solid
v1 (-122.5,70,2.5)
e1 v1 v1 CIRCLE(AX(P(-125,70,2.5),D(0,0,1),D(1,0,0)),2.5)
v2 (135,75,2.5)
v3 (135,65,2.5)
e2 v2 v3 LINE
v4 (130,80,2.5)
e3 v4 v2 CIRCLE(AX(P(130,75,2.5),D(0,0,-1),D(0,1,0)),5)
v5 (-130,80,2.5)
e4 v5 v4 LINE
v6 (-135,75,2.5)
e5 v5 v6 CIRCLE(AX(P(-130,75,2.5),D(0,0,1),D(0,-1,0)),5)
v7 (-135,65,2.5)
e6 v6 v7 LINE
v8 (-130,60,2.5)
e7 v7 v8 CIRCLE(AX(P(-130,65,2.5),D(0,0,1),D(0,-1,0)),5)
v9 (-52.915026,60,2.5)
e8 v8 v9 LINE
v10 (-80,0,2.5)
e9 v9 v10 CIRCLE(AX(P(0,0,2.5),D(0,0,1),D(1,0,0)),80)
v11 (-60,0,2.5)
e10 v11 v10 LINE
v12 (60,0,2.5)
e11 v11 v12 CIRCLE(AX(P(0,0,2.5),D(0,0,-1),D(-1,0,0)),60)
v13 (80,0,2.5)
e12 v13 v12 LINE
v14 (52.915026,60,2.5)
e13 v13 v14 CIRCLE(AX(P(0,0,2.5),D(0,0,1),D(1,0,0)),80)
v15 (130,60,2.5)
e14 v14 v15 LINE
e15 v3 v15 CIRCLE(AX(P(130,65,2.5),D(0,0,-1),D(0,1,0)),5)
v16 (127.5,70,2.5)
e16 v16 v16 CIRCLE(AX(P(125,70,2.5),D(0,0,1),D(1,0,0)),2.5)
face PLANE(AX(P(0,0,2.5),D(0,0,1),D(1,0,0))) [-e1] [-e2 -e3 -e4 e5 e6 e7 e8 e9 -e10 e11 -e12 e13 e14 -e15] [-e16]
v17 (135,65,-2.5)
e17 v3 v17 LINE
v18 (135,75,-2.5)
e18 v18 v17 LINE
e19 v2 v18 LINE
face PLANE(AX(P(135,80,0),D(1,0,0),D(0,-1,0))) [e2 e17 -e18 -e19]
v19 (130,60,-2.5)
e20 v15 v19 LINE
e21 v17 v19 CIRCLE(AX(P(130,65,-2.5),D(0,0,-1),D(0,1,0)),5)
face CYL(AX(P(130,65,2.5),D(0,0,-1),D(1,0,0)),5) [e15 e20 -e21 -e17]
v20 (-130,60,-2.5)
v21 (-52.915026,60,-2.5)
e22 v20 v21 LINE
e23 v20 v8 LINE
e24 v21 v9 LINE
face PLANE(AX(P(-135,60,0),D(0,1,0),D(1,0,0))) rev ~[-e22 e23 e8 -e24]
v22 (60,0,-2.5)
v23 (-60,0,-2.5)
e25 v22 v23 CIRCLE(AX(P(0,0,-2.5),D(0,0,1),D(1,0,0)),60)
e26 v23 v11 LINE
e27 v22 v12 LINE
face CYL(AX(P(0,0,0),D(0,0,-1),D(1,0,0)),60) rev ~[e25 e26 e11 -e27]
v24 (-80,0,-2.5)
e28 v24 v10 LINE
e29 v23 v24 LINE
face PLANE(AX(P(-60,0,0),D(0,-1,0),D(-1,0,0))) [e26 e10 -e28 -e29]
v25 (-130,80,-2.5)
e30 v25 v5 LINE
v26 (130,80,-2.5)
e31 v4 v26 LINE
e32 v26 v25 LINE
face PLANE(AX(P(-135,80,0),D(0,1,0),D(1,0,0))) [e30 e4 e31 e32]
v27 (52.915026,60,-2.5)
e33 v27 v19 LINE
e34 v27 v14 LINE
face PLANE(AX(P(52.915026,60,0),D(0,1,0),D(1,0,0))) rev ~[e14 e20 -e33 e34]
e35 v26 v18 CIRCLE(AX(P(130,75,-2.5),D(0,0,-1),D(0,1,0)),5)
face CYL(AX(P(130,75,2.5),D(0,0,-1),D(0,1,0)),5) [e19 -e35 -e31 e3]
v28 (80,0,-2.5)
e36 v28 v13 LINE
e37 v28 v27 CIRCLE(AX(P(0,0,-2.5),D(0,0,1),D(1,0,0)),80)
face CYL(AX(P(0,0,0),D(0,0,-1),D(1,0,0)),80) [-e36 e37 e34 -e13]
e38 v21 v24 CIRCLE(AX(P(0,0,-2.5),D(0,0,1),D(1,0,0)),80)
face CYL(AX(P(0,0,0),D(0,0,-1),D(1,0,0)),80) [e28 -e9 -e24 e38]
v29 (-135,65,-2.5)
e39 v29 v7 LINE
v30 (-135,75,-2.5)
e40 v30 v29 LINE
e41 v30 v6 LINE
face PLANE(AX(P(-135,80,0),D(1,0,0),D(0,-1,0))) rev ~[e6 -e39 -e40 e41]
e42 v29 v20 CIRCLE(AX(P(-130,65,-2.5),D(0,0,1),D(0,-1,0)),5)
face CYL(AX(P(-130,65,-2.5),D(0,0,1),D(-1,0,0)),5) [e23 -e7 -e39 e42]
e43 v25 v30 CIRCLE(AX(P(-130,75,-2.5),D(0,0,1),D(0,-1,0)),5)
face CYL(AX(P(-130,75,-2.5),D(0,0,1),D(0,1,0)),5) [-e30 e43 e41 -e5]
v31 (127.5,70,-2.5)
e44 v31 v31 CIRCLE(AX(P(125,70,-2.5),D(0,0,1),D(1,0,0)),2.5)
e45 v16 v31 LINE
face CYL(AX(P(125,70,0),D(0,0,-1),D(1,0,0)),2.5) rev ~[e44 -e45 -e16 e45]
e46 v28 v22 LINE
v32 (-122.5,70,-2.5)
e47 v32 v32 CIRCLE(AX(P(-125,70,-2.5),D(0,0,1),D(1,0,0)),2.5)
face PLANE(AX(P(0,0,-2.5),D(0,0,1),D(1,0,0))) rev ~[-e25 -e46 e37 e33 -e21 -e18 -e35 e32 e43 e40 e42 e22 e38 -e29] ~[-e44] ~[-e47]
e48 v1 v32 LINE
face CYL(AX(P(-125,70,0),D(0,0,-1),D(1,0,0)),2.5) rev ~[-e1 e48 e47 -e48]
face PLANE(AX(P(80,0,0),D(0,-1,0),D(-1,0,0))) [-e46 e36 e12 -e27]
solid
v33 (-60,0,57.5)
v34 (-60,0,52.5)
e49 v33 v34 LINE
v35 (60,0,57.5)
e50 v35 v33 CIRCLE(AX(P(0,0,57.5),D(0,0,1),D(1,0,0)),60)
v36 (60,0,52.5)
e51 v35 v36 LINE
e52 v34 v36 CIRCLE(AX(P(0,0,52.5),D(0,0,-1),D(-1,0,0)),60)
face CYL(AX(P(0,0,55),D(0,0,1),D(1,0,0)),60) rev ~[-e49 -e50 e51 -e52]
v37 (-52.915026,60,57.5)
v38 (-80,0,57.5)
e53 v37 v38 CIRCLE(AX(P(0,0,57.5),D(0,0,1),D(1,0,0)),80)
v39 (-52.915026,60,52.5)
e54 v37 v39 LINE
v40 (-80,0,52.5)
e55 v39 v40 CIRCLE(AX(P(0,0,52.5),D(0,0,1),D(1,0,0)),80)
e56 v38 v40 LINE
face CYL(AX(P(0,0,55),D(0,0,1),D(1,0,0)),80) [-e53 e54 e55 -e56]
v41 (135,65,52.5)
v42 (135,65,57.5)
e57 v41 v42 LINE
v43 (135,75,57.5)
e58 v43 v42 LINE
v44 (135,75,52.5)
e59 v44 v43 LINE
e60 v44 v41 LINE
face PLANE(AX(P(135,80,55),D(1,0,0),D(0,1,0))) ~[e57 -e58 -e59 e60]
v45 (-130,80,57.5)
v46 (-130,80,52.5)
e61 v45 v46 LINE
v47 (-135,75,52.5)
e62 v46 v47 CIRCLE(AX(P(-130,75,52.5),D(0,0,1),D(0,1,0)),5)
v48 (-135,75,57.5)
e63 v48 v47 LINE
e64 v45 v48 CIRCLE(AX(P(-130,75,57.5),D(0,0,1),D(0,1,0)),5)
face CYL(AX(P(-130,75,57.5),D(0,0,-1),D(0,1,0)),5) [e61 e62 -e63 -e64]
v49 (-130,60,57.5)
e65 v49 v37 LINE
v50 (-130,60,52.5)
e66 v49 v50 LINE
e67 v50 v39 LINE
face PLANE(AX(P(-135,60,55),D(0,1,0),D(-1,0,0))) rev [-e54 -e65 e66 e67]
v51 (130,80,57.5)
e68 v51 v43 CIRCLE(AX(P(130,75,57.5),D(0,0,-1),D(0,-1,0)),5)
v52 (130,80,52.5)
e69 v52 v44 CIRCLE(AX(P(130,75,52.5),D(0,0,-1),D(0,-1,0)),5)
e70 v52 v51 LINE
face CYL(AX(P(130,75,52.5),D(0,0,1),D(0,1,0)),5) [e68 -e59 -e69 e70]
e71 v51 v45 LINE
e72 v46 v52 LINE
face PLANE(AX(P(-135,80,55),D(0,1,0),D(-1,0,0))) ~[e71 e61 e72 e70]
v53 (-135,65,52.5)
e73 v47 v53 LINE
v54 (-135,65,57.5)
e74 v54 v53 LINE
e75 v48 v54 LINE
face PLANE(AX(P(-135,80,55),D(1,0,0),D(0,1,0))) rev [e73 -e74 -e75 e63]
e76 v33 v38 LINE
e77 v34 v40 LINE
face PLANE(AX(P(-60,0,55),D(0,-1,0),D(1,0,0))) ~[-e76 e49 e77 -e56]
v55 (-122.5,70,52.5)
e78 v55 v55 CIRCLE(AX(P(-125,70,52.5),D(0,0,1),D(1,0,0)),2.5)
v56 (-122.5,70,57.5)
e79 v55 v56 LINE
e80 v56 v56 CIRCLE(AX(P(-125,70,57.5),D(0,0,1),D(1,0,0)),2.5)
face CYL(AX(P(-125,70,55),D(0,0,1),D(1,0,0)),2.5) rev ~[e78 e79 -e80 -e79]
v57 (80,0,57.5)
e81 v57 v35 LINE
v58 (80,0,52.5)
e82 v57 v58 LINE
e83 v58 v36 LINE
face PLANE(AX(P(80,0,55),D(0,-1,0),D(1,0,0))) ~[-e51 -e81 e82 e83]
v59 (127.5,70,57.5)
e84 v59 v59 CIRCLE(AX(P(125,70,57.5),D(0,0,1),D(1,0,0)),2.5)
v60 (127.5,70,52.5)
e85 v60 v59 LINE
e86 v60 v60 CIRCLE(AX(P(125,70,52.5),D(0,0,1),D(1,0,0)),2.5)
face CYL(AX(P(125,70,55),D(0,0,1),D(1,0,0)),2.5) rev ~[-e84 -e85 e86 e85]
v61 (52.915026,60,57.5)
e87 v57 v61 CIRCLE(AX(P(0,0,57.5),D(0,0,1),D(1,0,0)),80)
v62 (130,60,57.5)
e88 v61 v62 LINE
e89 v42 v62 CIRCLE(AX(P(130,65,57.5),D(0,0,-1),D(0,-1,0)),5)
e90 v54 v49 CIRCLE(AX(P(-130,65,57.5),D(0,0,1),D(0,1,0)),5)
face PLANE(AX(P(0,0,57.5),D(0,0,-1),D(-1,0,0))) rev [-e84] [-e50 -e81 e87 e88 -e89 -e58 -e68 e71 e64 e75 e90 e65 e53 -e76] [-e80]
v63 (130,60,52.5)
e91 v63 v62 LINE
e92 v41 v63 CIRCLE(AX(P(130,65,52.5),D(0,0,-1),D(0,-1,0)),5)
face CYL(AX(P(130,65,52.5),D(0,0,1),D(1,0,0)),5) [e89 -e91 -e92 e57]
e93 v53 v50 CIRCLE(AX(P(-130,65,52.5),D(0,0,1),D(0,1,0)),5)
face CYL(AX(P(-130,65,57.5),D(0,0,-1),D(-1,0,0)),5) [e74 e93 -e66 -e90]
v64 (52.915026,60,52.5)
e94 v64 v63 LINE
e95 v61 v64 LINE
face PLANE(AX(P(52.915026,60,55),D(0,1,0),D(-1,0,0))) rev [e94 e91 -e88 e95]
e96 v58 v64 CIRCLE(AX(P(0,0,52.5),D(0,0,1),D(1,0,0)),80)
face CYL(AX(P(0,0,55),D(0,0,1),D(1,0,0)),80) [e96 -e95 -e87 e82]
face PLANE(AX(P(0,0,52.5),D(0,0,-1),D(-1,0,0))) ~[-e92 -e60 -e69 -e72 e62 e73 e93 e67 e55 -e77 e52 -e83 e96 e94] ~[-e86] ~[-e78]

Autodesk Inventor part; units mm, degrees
ref_plane "YZ Plane" through (0, 0, 0) normal (1, 0, 0) x (0, 1, 0)
ref_plane "XZ Plane" through (0, 0, 0) normal (0, 1, 0) x (-1, 0, 0)
ref_plane "XY Plane" through (0, 0, 0) normal (0, 0, 1) x (1, 0, 0)
sketch "Sketch1" plane through (0, 0, 0) normal (0, 0, 1) x (1, 0, 0)
  line L0 (-135, 80) -> (135, 80)
  line L1 (-135, 80) -> (-135, 60)
  line L2 (135, 80) -> (135, 60)
  line L3 (-135, 60) -> (135, 60)
  arc A0 (60, 0) -> (-60, 0) centre (0, 0) ccw
  arc A1 (80, 0) -> (-80, 0) centre (0, 0) ccw
  line L4 (80, 0) -> (60, 0)
  line L5 (60, 0) -> (80, 0)
  line L6 (-60, 0) -> (-80, 0)
  circle A2 centre (125, 70) radius 2.5
  circle A3 centre (-125, 70) radius 2.5
  point P0 (0, 80)
  point P1 (52.915, 60)
  point P2 (-52.915, 60)
  point P3 (-135, 70)
  point P4 (-125, 80)
  point P5 (-125, 60)
  point P6 (125, 60)
  point P7 (125, 80)
  point P8 (135, 70)
  point P9 (-135, 70)
  point P10 (0, 80)
  point P11 (0, 60)
  dimension "d0" = 270
  dimension "d1" = 80
  dimension "d2" = 20
  dimension "d10" = 5
  dimension "d11" = 10
  dimension "d12" = 10
  dimension "d13" = 5
  dimension "d14" = 10
  dimension "d15" = 10
extrude "Extrusion2" add sketch "Sketch1" along normal mid plane 5
ref_plane "Work Plane3" through (0, 0, 27.5) normal (0, 0, 1) x (1, 0, 0)
mirror "Mirror2" about plane through (0, 0, 27.5) normal (0, 0, 1) of "Extrusion2"
fillet "Fillet1" radius 5 8 edges at (135, 80, 0) (135, 60, 0) (135, 80, 55) (135, 60, 55) (-135, 80, 0) (-135, 60, 0) (-135, 80, 55) (-135, 60, 55)
properties part number "Conveyor_001_001" material "ABS Plastic"
